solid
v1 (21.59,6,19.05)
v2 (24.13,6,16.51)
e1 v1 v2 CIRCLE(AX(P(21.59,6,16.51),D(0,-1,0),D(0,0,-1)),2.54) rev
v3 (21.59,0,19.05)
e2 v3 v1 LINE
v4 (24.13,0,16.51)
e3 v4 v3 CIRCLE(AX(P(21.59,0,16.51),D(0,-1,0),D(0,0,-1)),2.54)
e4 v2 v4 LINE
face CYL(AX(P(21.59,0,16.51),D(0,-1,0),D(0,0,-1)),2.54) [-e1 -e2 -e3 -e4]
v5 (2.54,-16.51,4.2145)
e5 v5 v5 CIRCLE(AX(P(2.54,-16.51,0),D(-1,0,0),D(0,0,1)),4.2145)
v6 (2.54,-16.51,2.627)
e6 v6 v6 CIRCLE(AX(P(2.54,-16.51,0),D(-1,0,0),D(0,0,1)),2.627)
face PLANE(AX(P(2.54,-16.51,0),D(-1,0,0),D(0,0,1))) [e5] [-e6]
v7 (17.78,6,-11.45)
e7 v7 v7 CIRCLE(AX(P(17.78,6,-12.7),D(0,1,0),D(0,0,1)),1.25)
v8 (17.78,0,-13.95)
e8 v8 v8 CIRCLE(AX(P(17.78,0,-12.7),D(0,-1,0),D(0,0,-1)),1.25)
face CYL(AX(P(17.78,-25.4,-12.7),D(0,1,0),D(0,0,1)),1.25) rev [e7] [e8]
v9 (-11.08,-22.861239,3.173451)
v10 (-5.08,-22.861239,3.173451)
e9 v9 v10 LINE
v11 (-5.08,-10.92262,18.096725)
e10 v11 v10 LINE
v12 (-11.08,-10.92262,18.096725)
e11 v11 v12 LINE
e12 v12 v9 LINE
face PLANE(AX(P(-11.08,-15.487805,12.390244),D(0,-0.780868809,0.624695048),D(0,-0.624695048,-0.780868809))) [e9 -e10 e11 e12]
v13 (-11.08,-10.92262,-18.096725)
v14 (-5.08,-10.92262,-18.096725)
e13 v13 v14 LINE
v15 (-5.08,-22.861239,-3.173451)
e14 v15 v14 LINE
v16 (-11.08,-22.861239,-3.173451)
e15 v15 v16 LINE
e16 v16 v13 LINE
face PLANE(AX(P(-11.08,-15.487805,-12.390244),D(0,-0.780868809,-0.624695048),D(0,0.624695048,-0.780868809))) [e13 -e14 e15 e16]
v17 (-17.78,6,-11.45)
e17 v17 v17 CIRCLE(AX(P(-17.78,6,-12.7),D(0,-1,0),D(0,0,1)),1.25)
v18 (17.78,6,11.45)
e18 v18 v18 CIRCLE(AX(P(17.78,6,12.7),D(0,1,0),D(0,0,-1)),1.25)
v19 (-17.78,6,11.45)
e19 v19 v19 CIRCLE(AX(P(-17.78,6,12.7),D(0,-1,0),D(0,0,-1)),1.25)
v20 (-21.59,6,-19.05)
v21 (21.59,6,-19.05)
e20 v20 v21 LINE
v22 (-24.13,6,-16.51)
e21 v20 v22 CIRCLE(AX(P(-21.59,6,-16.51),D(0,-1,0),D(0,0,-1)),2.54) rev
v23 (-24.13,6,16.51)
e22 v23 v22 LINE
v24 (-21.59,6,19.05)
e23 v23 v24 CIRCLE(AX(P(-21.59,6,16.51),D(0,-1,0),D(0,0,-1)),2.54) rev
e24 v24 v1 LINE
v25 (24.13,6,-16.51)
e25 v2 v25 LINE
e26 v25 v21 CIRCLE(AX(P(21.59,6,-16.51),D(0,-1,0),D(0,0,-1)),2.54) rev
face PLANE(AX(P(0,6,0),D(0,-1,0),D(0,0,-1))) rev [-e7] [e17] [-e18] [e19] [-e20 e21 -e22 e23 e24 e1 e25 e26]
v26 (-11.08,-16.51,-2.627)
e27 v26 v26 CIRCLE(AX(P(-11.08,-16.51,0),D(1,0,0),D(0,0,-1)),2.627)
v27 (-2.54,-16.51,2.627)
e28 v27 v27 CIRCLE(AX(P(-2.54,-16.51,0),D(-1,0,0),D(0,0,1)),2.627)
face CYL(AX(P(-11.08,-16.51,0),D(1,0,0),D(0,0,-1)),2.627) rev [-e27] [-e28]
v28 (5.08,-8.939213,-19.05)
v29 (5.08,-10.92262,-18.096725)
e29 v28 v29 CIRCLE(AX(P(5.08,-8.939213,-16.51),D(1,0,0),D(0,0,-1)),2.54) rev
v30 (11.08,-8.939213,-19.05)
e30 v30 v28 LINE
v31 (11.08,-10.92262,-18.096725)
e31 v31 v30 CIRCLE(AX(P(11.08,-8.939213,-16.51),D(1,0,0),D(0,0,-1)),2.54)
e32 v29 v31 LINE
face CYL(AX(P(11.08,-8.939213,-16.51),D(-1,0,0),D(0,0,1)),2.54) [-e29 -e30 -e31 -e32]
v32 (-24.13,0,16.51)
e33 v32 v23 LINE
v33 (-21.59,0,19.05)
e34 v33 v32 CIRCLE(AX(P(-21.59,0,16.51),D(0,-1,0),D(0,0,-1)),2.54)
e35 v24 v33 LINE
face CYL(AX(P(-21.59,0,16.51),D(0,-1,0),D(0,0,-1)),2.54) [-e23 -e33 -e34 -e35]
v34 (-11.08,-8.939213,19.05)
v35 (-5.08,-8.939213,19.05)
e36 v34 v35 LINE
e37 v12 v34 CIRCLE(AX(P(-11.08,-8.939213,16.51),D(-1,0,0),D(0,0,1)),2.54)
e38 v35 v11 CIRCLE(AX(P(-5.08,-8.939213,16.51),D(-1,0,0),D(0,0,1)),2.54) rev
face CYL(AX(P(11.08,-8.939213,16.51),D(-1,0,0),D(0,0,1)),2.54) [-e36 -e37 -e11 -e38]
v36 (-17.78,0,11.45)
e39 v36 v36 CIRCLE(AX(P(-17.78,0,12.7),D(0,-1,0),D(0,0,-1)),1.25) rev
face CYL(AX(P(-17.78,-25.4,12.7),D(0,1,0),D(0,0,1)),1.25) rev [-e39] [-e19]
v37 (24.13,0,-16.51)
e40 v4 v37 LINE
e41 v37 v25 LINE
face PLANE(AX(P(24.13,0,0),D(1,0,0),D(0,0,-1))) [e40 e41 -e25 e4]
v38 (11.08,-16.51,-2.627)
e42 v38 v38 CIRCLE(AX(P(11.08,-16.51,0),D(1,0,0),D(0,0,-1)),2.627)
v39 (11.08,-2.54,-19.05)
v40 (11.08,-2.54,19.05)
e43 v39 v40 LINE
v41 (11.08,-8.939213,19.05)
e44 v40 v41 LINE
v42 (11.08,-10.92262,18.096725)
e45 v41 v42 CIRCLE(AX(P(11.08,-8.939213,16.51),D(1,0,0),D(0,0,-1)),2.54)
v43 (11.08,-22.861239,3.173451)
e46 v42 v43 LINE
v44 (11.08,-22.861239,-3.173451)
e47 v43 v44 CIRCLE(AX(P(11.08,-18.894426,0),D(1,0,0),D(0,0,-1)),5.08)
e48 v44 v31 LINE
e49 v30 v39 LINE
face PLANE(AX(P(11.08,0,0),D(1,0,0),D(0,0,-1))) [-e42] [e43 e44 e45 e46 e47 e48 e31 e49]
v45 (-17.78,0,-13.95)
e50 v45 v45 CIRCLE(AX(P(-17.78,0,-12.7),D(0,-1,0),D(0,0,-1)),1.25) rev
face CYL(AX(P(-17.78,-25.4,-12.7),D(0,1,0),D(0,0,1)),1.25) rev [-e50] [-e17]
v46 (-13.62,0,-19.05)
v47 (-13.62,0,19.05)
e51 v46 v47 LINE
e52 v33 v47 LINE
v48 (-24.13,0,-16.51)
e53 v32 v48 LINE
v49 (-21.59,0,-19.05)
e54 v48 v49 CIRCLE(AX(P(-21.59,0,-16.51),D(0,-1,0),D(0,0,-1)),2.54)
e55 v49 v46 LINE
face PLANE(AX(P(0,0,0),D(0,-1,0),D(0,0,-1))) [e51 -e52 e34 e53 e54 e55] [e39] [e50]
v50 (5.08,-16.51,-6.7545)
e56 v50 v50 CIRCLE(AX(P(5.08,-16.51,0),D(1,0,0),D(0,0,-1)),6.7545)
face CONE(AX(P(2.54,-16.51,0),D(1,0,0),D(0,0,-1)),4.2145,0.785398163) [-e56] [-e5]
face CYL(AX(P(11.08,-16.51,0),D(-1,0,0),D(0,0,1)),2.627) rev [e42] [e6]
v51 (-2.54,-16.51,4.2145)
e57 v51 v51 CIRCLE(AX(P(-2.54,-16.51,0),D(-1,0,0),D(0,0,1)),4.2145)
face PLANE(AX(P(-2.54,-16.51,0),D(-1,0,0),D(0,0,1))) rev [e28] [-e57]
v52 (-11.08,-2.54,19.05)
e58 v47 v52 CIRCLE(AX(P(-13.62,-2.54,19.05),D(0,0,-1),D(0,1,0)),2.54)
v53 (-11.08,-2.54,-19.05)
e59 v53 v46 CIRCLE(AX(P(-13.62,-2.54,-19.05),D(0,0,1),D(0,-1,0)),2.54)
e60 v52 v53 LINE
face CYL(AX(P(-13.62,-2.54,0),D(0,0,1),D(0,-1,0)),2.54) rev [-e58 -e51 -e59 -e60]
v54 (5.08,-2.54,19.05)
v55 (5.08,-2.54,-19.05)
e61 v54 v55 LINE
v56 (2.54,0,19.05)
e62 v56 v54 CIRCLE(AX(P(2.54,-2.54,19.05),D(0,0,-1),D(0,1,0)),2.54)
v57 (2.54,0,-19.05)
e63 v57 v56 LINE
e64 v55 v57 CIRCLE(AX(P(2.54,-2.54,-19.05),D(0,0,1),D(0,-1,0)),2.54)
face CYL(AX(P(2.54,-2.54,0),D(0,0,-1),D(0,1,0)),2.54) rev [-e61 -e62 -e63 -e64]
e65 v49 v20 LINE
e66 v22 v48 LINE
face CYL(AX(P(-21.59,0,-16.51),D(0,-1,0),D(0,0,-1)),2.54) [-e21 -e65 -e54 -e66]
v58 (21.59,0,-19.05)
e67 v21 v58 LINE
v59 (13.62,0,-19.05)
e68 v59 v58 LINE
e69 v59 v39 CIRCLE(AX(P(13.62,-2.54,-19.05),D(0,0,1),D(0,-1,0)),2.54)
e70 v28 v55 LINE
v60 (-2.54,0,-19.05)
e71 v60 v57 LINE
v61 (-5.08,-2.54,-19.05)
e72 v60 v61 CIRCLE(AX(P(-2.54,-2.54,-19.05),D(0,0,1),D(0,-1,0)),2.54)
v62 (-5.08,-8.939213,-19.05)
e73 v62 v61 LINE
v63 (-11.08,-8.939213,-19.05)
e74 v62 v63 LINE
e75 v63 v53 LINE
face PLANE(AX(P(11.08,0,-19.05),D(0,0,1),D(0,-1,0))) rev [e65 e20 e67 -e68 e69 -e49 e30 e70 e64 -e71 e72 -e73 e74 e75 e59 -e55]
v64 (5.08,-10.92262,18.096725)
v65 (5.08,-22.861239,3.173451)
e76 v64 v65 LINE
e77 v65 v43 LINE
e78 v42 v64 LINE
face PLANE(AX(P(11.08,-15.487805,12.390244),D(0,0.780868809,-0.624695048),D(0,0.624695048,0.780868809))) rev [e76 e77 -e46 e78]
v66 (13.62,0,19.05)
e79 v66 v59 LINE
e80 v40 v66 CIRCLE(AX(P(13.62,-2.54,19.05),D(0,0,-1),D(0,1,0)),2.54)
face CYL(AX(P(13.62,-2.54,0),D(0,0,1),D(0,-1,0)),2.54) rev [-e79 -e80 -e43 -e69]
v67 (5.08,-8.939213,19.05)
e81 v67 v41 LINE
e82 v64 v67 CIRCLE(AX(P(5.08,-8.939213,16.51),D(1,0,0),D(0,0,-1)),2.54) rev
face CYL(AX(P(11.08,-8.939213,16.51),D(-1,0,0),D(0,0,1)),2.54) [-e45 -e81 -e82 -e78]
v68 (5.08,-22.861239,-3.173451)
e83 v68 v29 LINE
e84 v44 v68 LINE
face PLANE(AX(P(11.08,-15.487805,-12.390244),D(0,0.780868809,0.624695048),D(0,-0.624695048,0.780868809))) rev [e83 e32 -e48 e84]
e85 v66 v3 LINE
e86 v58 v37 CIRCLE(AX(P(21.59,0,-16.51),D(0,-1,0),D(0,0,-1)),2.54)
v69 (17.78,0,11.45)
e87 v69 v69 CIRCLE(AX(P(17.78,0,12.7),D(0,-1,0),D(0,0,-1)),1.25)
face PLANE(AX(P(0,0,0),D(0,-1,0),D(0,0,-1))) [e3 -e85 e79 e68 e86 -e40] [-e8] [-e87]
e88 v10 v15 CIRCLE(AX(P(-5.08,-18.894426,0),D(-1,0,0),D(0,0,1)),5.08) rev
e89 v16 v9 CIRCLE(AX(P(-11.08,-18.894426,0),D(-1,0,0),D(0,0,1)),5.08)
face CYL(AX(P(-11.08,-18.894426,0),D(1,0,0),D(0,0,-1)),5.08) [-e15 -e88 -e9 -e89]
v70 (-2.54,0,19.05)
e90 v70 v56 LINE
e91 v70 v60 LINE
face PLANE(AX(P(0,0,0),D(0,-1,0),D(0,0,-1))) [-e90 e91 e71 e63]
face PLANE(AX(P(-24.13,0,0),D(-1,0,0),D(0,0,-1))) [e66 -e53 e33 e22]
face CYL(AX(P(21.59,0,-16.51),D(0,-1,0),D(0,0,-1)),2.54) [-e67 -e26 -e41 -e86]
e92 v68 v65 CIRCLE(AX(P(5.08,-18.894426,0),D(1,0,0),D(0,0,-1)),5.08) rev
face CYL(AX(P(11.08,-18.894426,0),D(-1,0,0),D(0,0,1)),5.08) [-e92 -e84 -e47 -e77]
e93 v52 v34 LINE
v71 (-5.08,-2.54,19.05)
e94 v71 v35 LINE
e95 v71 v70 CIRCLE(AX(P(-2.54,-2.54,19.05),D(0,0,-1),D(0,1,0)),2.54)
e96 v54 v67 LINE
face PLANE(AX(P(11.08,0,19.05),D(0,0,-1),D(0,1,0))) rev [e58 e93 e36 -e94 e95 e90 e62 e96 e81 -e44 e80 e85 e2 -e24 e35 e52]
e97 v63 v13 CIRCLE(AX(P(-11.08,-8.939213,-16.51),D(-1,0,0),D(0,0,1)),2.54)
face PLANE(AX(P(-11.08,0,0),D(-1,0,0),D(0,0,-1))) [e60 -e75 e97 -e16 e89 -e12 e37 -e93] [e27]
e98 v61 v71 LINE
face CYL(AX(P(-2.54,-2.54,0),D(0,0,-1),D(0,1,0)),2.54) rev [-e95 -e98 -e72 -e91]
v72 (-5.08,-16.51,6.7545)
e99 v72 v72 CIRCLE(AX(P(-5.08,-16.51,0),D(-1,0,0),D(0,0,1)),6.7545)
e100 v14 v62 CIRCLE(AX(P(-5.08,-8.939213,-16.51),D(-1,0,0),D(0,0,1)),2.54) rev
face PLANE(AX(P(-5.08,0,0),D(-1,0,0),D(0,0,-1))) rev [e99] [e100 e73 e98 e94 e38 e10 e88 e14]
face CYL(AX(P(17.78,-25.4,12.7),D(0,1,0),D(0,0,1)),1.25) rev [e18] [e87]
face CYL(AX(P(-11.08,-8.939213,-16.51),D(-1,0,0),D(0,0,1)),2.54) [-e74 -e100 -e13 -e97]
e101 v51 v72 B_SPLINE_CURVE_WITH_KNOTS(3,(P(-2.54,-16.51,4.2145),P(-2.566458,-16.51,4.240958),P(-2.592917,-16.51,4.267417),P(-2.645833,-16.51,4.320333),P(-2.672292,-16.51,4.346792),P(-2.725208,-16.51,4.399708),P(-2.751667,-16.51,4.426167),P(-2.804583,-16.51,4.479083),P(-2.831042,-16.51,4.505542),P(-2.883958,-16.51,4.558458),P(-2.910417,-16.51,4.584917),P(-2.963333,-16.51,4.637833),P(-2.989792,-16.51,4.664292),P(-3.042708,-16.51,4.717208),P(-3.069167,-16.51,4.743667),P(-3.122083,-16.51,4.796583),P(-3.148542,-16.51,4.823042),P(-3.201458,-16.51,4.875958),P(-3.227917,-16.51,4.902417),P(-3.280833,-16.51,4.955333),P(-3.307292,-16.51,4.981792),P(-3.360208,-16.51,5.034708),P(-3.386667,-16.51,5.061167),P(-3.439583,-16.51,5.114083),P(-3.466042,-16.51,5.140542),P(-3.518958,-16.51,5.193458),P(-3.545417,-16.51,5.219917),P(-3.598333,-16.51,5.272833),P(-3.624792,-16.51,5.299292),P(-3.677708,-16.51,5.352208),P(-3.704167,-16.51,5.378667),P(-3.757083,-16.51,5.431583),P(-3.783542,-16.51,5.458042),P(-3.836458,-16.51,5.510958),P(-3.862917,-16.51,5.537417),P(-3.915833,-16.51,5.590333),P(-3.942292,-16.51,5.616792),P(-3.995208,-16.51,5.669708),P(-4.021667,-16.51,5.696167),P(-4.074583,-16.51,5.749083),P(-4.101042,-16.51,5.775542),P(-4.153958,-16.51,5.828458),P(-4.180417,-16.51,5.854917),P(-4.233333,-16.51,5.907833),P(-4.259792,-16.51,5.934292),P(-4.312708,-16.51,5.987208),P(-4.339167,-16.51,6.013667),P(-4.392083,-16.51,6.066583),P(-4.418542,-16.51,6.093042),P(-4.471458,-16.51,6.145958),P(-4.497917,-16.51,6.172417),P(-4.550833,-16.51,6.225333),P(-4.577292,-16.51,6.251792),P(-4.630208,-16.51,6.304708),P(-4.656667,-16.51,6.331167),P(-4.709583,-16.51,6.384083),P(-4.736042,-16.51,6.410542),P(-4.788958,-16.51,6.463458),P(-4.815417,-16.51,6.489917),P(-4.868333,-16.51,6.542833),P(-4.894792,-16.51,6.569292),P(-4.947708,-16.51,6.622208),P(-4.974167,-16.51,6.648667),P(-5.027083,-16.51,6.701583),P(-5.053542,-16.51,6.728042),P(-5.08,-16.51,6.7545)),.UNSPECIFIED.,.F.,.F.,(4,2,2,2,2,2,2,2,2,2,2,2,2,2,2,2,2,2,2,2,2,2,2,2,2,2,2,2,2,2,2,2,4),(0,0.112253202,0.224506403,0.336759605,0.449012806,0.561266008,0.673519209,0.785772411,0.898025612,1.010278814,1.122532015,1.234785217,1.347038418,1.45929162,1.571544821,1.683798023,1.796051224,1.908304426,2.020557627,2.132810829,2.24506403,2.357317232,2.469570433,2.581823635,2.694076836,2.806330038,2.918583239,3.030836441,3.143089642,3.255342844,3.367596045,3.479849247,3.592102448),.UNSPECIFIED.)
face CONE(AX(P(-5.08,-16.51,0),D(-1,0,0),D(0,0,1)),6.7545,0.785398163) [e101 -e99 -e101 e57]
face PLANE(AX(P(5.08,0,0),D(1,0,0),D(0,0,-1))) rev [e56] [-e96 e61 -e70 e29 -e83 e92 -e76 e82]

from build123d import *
from OCP.BRepFilletAPI import BRepFilletAPI_MakeFillet

# Parameters (mm, degrees)
SKETCH1_R           = 2.627
BOSS_EXTRUDE1_DEPTH = 6
BOSS_EXTRUDE2_START = -5.08
SKETCH1_3_W         = 38.1
SKETCH1_3_H         = 5.999999938
BOSS_EXTRUDE2_DEPTH = 24.13
SKETCH3_R           = 1.25
CUT_EXTRUDE1_DEPTH  = 44.944503594
FILLET1_R1          = 2.54
FILLET1_R2          = 5.08
SKETCH4_R           = 4.2145
SKETCH4_R_2         = 2.627
BOSS_EXTRUDE3_DEPTH = 2.54
BOSS_EXTRUDE4_START = 7.62
SKETCH4_2_R         = 4.2145
SKETCH4_2_R_2       = 2.627
BOSS_EXTRUDE4_DEPTH = 2.54
CHAMFER2_SIZE       = 2.54


with BuildPart() as part:
    # Sketch1 → Boss-Extrude1 (new body)
    with BuildSketch(Plane(origin=(5.08, 0, 0), x_dir=(0, 0, -1), z_dir=(1, 0, 0))):
        Polygon((-19.05, 0), (-19.05, -10.16), (0, -25.4), (19.05, -10.16), (19.05, 0), align=None)
        with Locations((0, -16.51)):
            Circle(SKETCH1_R, mode=Mode.SUBTRACT)
    boss_extrude1 = extrude(amount=BOSS_EXTRUDE1_DEPTH)

    # Sketch1<3> → Boss-Extrude2 (add)
    with BuildSketch(Plane(origin=(5.08, 0, 0), x_dir=(0, 0, -1), z_dir=(1, 0, 0)).offset(BOSS_EXTRUDE2_START)):
        with Locations((0, 2.999999969)):
            Rectangle(SKETCH1_3_W, SKETCH1_3_H)
    boss_extrude2 = extrude(amount=BOSS_EXTRUDE2_DEPTH)

    # Sketch3 → Cut-Extrude1 (cut, through all)
    with BuildSketch(Plane(origin=(0, 5.999999938, 0), x_dir=(1, 0, 0), z_dir=(0, 1, 0))):
        with Locations(Location((17.78, 12.7, 0), (0, 0, 270))):
            Circle(SKETCH3_R)
        with Locations(Location((17.78, -12.7, 0), (0, 0, 90))):
            Circle(SKETCH3_R)
    cut_extrude1 = extrude(amount=-CUT_EXTRUDE1_DEPTH, mode=Mode.SUBTRACT)

    # Mirror2: Boss-Extrude2, Cut-Extrude1 across plane
    add(boss_extrude2.mirror(Plane(origin=(0, 0, 0), x_dir=(0, 0, 1), z_dir=(1, 0, 0))))
    add(cut_extrude1.mirror(Plane(origin=(0, 0, 0), x_dir=(0, 0, 1), z_dir=(1, 0, 0))), mode=Mode.SUBTRACT)

    # Mirror3: Boss-Extrude1 across plane
    add(boss_extrude1.mirror(Plane(origin=(0, 0, 0), x_dir=(0, 0, 1), z_dir=(1, 0, 0))))

    # Fillet1: one fillet with a radius per group of edges: ONE call of the kernel's fillet builder (fillet() takes one radius for all edges)
    fillet1_edges_1 = [part.edges().sort_by_distance(p)[0] for p in [
        (8.08, -10.16, 19.05),
        (8.08, -10.16, -19.05),
        (11.08, 0, 0),
        (24.13, 2.999999969, 19.05),
        (24.13, 2.999999969, -19.05),
        (-24.13, 2.999999969, -19.05),
        (-24.13, 2.999999969, 19.05),
        (-8.08, -10.16, -19.05),
        (-8.08, -10.16, 19.05),
        (-5.08, 0, 0),
        (-11.08, 0, 0),
        (5.08, 0, 0),
    ]]
    fillet1_edges_2 = [part.edges().sort_by_distance(p)[0] for p in [
        (8.08, -25.4, 0),
        (-8.08, -25.4, 0),
    ]]
    fillet1 = BRepFilletAPI_MakeFillet(part.part.solid().wrapped)
    for e in fillet1_edges_1:
        fillet1.Add(FILLET1_R1, e.wrapped)
    for e in fillet1_edges_2:
        fillet1.Add(FILLET1_R2, e.wrapped)
    add(Compound.cast(fillet1.Shape()), mode=Mode.REPLACE)

    # Sketch4 → Boss-Extrude3 (add)
    with BuildSketch(Plane.ZY.offset(-5.08)):
        with Locations(Location((0, -16.51, 0), (0, 0, 180))):
            Circle(SKETCH4_R)
        with Locations((0, -16.51)):
            Circle(SKETCH4_R_2, mode=Mode.SUBTRACT)
    extrude(amount=BOSS_EXTRUDE3_DEPTH)

    # Sketch4<2> → Boss-Extrude4 (add)
    with BuildSketch(Plane.ZY.offset(-5.08).offset(BOSS_EXTRUDE4_START)):
        with Locations(Location((0, -16.51, 0), (0, 0, 180))):
            Circle(SKETCH4_2_R)
        with Locations((0, -16.51)):
            Circle(SKETCH4_2_R_2, mode=Mode.SUBTRACT)
    extrude(amount=BOSS_EXTRUDE4_DEPTH)

    # Chamfer2
    chamfer2_edges = [part.edges().sort_by_distance(p)[0] for p in [
        (5.08, -16.51, 4.2145),
        (-5.08, -16.51, 4.2145),
    ]]
    chamfer(chamfer2_edges, length=CHAMFER2_SIZE - 0.0001)  # a hair under: the kernel refuses the full size


solid = part.part
